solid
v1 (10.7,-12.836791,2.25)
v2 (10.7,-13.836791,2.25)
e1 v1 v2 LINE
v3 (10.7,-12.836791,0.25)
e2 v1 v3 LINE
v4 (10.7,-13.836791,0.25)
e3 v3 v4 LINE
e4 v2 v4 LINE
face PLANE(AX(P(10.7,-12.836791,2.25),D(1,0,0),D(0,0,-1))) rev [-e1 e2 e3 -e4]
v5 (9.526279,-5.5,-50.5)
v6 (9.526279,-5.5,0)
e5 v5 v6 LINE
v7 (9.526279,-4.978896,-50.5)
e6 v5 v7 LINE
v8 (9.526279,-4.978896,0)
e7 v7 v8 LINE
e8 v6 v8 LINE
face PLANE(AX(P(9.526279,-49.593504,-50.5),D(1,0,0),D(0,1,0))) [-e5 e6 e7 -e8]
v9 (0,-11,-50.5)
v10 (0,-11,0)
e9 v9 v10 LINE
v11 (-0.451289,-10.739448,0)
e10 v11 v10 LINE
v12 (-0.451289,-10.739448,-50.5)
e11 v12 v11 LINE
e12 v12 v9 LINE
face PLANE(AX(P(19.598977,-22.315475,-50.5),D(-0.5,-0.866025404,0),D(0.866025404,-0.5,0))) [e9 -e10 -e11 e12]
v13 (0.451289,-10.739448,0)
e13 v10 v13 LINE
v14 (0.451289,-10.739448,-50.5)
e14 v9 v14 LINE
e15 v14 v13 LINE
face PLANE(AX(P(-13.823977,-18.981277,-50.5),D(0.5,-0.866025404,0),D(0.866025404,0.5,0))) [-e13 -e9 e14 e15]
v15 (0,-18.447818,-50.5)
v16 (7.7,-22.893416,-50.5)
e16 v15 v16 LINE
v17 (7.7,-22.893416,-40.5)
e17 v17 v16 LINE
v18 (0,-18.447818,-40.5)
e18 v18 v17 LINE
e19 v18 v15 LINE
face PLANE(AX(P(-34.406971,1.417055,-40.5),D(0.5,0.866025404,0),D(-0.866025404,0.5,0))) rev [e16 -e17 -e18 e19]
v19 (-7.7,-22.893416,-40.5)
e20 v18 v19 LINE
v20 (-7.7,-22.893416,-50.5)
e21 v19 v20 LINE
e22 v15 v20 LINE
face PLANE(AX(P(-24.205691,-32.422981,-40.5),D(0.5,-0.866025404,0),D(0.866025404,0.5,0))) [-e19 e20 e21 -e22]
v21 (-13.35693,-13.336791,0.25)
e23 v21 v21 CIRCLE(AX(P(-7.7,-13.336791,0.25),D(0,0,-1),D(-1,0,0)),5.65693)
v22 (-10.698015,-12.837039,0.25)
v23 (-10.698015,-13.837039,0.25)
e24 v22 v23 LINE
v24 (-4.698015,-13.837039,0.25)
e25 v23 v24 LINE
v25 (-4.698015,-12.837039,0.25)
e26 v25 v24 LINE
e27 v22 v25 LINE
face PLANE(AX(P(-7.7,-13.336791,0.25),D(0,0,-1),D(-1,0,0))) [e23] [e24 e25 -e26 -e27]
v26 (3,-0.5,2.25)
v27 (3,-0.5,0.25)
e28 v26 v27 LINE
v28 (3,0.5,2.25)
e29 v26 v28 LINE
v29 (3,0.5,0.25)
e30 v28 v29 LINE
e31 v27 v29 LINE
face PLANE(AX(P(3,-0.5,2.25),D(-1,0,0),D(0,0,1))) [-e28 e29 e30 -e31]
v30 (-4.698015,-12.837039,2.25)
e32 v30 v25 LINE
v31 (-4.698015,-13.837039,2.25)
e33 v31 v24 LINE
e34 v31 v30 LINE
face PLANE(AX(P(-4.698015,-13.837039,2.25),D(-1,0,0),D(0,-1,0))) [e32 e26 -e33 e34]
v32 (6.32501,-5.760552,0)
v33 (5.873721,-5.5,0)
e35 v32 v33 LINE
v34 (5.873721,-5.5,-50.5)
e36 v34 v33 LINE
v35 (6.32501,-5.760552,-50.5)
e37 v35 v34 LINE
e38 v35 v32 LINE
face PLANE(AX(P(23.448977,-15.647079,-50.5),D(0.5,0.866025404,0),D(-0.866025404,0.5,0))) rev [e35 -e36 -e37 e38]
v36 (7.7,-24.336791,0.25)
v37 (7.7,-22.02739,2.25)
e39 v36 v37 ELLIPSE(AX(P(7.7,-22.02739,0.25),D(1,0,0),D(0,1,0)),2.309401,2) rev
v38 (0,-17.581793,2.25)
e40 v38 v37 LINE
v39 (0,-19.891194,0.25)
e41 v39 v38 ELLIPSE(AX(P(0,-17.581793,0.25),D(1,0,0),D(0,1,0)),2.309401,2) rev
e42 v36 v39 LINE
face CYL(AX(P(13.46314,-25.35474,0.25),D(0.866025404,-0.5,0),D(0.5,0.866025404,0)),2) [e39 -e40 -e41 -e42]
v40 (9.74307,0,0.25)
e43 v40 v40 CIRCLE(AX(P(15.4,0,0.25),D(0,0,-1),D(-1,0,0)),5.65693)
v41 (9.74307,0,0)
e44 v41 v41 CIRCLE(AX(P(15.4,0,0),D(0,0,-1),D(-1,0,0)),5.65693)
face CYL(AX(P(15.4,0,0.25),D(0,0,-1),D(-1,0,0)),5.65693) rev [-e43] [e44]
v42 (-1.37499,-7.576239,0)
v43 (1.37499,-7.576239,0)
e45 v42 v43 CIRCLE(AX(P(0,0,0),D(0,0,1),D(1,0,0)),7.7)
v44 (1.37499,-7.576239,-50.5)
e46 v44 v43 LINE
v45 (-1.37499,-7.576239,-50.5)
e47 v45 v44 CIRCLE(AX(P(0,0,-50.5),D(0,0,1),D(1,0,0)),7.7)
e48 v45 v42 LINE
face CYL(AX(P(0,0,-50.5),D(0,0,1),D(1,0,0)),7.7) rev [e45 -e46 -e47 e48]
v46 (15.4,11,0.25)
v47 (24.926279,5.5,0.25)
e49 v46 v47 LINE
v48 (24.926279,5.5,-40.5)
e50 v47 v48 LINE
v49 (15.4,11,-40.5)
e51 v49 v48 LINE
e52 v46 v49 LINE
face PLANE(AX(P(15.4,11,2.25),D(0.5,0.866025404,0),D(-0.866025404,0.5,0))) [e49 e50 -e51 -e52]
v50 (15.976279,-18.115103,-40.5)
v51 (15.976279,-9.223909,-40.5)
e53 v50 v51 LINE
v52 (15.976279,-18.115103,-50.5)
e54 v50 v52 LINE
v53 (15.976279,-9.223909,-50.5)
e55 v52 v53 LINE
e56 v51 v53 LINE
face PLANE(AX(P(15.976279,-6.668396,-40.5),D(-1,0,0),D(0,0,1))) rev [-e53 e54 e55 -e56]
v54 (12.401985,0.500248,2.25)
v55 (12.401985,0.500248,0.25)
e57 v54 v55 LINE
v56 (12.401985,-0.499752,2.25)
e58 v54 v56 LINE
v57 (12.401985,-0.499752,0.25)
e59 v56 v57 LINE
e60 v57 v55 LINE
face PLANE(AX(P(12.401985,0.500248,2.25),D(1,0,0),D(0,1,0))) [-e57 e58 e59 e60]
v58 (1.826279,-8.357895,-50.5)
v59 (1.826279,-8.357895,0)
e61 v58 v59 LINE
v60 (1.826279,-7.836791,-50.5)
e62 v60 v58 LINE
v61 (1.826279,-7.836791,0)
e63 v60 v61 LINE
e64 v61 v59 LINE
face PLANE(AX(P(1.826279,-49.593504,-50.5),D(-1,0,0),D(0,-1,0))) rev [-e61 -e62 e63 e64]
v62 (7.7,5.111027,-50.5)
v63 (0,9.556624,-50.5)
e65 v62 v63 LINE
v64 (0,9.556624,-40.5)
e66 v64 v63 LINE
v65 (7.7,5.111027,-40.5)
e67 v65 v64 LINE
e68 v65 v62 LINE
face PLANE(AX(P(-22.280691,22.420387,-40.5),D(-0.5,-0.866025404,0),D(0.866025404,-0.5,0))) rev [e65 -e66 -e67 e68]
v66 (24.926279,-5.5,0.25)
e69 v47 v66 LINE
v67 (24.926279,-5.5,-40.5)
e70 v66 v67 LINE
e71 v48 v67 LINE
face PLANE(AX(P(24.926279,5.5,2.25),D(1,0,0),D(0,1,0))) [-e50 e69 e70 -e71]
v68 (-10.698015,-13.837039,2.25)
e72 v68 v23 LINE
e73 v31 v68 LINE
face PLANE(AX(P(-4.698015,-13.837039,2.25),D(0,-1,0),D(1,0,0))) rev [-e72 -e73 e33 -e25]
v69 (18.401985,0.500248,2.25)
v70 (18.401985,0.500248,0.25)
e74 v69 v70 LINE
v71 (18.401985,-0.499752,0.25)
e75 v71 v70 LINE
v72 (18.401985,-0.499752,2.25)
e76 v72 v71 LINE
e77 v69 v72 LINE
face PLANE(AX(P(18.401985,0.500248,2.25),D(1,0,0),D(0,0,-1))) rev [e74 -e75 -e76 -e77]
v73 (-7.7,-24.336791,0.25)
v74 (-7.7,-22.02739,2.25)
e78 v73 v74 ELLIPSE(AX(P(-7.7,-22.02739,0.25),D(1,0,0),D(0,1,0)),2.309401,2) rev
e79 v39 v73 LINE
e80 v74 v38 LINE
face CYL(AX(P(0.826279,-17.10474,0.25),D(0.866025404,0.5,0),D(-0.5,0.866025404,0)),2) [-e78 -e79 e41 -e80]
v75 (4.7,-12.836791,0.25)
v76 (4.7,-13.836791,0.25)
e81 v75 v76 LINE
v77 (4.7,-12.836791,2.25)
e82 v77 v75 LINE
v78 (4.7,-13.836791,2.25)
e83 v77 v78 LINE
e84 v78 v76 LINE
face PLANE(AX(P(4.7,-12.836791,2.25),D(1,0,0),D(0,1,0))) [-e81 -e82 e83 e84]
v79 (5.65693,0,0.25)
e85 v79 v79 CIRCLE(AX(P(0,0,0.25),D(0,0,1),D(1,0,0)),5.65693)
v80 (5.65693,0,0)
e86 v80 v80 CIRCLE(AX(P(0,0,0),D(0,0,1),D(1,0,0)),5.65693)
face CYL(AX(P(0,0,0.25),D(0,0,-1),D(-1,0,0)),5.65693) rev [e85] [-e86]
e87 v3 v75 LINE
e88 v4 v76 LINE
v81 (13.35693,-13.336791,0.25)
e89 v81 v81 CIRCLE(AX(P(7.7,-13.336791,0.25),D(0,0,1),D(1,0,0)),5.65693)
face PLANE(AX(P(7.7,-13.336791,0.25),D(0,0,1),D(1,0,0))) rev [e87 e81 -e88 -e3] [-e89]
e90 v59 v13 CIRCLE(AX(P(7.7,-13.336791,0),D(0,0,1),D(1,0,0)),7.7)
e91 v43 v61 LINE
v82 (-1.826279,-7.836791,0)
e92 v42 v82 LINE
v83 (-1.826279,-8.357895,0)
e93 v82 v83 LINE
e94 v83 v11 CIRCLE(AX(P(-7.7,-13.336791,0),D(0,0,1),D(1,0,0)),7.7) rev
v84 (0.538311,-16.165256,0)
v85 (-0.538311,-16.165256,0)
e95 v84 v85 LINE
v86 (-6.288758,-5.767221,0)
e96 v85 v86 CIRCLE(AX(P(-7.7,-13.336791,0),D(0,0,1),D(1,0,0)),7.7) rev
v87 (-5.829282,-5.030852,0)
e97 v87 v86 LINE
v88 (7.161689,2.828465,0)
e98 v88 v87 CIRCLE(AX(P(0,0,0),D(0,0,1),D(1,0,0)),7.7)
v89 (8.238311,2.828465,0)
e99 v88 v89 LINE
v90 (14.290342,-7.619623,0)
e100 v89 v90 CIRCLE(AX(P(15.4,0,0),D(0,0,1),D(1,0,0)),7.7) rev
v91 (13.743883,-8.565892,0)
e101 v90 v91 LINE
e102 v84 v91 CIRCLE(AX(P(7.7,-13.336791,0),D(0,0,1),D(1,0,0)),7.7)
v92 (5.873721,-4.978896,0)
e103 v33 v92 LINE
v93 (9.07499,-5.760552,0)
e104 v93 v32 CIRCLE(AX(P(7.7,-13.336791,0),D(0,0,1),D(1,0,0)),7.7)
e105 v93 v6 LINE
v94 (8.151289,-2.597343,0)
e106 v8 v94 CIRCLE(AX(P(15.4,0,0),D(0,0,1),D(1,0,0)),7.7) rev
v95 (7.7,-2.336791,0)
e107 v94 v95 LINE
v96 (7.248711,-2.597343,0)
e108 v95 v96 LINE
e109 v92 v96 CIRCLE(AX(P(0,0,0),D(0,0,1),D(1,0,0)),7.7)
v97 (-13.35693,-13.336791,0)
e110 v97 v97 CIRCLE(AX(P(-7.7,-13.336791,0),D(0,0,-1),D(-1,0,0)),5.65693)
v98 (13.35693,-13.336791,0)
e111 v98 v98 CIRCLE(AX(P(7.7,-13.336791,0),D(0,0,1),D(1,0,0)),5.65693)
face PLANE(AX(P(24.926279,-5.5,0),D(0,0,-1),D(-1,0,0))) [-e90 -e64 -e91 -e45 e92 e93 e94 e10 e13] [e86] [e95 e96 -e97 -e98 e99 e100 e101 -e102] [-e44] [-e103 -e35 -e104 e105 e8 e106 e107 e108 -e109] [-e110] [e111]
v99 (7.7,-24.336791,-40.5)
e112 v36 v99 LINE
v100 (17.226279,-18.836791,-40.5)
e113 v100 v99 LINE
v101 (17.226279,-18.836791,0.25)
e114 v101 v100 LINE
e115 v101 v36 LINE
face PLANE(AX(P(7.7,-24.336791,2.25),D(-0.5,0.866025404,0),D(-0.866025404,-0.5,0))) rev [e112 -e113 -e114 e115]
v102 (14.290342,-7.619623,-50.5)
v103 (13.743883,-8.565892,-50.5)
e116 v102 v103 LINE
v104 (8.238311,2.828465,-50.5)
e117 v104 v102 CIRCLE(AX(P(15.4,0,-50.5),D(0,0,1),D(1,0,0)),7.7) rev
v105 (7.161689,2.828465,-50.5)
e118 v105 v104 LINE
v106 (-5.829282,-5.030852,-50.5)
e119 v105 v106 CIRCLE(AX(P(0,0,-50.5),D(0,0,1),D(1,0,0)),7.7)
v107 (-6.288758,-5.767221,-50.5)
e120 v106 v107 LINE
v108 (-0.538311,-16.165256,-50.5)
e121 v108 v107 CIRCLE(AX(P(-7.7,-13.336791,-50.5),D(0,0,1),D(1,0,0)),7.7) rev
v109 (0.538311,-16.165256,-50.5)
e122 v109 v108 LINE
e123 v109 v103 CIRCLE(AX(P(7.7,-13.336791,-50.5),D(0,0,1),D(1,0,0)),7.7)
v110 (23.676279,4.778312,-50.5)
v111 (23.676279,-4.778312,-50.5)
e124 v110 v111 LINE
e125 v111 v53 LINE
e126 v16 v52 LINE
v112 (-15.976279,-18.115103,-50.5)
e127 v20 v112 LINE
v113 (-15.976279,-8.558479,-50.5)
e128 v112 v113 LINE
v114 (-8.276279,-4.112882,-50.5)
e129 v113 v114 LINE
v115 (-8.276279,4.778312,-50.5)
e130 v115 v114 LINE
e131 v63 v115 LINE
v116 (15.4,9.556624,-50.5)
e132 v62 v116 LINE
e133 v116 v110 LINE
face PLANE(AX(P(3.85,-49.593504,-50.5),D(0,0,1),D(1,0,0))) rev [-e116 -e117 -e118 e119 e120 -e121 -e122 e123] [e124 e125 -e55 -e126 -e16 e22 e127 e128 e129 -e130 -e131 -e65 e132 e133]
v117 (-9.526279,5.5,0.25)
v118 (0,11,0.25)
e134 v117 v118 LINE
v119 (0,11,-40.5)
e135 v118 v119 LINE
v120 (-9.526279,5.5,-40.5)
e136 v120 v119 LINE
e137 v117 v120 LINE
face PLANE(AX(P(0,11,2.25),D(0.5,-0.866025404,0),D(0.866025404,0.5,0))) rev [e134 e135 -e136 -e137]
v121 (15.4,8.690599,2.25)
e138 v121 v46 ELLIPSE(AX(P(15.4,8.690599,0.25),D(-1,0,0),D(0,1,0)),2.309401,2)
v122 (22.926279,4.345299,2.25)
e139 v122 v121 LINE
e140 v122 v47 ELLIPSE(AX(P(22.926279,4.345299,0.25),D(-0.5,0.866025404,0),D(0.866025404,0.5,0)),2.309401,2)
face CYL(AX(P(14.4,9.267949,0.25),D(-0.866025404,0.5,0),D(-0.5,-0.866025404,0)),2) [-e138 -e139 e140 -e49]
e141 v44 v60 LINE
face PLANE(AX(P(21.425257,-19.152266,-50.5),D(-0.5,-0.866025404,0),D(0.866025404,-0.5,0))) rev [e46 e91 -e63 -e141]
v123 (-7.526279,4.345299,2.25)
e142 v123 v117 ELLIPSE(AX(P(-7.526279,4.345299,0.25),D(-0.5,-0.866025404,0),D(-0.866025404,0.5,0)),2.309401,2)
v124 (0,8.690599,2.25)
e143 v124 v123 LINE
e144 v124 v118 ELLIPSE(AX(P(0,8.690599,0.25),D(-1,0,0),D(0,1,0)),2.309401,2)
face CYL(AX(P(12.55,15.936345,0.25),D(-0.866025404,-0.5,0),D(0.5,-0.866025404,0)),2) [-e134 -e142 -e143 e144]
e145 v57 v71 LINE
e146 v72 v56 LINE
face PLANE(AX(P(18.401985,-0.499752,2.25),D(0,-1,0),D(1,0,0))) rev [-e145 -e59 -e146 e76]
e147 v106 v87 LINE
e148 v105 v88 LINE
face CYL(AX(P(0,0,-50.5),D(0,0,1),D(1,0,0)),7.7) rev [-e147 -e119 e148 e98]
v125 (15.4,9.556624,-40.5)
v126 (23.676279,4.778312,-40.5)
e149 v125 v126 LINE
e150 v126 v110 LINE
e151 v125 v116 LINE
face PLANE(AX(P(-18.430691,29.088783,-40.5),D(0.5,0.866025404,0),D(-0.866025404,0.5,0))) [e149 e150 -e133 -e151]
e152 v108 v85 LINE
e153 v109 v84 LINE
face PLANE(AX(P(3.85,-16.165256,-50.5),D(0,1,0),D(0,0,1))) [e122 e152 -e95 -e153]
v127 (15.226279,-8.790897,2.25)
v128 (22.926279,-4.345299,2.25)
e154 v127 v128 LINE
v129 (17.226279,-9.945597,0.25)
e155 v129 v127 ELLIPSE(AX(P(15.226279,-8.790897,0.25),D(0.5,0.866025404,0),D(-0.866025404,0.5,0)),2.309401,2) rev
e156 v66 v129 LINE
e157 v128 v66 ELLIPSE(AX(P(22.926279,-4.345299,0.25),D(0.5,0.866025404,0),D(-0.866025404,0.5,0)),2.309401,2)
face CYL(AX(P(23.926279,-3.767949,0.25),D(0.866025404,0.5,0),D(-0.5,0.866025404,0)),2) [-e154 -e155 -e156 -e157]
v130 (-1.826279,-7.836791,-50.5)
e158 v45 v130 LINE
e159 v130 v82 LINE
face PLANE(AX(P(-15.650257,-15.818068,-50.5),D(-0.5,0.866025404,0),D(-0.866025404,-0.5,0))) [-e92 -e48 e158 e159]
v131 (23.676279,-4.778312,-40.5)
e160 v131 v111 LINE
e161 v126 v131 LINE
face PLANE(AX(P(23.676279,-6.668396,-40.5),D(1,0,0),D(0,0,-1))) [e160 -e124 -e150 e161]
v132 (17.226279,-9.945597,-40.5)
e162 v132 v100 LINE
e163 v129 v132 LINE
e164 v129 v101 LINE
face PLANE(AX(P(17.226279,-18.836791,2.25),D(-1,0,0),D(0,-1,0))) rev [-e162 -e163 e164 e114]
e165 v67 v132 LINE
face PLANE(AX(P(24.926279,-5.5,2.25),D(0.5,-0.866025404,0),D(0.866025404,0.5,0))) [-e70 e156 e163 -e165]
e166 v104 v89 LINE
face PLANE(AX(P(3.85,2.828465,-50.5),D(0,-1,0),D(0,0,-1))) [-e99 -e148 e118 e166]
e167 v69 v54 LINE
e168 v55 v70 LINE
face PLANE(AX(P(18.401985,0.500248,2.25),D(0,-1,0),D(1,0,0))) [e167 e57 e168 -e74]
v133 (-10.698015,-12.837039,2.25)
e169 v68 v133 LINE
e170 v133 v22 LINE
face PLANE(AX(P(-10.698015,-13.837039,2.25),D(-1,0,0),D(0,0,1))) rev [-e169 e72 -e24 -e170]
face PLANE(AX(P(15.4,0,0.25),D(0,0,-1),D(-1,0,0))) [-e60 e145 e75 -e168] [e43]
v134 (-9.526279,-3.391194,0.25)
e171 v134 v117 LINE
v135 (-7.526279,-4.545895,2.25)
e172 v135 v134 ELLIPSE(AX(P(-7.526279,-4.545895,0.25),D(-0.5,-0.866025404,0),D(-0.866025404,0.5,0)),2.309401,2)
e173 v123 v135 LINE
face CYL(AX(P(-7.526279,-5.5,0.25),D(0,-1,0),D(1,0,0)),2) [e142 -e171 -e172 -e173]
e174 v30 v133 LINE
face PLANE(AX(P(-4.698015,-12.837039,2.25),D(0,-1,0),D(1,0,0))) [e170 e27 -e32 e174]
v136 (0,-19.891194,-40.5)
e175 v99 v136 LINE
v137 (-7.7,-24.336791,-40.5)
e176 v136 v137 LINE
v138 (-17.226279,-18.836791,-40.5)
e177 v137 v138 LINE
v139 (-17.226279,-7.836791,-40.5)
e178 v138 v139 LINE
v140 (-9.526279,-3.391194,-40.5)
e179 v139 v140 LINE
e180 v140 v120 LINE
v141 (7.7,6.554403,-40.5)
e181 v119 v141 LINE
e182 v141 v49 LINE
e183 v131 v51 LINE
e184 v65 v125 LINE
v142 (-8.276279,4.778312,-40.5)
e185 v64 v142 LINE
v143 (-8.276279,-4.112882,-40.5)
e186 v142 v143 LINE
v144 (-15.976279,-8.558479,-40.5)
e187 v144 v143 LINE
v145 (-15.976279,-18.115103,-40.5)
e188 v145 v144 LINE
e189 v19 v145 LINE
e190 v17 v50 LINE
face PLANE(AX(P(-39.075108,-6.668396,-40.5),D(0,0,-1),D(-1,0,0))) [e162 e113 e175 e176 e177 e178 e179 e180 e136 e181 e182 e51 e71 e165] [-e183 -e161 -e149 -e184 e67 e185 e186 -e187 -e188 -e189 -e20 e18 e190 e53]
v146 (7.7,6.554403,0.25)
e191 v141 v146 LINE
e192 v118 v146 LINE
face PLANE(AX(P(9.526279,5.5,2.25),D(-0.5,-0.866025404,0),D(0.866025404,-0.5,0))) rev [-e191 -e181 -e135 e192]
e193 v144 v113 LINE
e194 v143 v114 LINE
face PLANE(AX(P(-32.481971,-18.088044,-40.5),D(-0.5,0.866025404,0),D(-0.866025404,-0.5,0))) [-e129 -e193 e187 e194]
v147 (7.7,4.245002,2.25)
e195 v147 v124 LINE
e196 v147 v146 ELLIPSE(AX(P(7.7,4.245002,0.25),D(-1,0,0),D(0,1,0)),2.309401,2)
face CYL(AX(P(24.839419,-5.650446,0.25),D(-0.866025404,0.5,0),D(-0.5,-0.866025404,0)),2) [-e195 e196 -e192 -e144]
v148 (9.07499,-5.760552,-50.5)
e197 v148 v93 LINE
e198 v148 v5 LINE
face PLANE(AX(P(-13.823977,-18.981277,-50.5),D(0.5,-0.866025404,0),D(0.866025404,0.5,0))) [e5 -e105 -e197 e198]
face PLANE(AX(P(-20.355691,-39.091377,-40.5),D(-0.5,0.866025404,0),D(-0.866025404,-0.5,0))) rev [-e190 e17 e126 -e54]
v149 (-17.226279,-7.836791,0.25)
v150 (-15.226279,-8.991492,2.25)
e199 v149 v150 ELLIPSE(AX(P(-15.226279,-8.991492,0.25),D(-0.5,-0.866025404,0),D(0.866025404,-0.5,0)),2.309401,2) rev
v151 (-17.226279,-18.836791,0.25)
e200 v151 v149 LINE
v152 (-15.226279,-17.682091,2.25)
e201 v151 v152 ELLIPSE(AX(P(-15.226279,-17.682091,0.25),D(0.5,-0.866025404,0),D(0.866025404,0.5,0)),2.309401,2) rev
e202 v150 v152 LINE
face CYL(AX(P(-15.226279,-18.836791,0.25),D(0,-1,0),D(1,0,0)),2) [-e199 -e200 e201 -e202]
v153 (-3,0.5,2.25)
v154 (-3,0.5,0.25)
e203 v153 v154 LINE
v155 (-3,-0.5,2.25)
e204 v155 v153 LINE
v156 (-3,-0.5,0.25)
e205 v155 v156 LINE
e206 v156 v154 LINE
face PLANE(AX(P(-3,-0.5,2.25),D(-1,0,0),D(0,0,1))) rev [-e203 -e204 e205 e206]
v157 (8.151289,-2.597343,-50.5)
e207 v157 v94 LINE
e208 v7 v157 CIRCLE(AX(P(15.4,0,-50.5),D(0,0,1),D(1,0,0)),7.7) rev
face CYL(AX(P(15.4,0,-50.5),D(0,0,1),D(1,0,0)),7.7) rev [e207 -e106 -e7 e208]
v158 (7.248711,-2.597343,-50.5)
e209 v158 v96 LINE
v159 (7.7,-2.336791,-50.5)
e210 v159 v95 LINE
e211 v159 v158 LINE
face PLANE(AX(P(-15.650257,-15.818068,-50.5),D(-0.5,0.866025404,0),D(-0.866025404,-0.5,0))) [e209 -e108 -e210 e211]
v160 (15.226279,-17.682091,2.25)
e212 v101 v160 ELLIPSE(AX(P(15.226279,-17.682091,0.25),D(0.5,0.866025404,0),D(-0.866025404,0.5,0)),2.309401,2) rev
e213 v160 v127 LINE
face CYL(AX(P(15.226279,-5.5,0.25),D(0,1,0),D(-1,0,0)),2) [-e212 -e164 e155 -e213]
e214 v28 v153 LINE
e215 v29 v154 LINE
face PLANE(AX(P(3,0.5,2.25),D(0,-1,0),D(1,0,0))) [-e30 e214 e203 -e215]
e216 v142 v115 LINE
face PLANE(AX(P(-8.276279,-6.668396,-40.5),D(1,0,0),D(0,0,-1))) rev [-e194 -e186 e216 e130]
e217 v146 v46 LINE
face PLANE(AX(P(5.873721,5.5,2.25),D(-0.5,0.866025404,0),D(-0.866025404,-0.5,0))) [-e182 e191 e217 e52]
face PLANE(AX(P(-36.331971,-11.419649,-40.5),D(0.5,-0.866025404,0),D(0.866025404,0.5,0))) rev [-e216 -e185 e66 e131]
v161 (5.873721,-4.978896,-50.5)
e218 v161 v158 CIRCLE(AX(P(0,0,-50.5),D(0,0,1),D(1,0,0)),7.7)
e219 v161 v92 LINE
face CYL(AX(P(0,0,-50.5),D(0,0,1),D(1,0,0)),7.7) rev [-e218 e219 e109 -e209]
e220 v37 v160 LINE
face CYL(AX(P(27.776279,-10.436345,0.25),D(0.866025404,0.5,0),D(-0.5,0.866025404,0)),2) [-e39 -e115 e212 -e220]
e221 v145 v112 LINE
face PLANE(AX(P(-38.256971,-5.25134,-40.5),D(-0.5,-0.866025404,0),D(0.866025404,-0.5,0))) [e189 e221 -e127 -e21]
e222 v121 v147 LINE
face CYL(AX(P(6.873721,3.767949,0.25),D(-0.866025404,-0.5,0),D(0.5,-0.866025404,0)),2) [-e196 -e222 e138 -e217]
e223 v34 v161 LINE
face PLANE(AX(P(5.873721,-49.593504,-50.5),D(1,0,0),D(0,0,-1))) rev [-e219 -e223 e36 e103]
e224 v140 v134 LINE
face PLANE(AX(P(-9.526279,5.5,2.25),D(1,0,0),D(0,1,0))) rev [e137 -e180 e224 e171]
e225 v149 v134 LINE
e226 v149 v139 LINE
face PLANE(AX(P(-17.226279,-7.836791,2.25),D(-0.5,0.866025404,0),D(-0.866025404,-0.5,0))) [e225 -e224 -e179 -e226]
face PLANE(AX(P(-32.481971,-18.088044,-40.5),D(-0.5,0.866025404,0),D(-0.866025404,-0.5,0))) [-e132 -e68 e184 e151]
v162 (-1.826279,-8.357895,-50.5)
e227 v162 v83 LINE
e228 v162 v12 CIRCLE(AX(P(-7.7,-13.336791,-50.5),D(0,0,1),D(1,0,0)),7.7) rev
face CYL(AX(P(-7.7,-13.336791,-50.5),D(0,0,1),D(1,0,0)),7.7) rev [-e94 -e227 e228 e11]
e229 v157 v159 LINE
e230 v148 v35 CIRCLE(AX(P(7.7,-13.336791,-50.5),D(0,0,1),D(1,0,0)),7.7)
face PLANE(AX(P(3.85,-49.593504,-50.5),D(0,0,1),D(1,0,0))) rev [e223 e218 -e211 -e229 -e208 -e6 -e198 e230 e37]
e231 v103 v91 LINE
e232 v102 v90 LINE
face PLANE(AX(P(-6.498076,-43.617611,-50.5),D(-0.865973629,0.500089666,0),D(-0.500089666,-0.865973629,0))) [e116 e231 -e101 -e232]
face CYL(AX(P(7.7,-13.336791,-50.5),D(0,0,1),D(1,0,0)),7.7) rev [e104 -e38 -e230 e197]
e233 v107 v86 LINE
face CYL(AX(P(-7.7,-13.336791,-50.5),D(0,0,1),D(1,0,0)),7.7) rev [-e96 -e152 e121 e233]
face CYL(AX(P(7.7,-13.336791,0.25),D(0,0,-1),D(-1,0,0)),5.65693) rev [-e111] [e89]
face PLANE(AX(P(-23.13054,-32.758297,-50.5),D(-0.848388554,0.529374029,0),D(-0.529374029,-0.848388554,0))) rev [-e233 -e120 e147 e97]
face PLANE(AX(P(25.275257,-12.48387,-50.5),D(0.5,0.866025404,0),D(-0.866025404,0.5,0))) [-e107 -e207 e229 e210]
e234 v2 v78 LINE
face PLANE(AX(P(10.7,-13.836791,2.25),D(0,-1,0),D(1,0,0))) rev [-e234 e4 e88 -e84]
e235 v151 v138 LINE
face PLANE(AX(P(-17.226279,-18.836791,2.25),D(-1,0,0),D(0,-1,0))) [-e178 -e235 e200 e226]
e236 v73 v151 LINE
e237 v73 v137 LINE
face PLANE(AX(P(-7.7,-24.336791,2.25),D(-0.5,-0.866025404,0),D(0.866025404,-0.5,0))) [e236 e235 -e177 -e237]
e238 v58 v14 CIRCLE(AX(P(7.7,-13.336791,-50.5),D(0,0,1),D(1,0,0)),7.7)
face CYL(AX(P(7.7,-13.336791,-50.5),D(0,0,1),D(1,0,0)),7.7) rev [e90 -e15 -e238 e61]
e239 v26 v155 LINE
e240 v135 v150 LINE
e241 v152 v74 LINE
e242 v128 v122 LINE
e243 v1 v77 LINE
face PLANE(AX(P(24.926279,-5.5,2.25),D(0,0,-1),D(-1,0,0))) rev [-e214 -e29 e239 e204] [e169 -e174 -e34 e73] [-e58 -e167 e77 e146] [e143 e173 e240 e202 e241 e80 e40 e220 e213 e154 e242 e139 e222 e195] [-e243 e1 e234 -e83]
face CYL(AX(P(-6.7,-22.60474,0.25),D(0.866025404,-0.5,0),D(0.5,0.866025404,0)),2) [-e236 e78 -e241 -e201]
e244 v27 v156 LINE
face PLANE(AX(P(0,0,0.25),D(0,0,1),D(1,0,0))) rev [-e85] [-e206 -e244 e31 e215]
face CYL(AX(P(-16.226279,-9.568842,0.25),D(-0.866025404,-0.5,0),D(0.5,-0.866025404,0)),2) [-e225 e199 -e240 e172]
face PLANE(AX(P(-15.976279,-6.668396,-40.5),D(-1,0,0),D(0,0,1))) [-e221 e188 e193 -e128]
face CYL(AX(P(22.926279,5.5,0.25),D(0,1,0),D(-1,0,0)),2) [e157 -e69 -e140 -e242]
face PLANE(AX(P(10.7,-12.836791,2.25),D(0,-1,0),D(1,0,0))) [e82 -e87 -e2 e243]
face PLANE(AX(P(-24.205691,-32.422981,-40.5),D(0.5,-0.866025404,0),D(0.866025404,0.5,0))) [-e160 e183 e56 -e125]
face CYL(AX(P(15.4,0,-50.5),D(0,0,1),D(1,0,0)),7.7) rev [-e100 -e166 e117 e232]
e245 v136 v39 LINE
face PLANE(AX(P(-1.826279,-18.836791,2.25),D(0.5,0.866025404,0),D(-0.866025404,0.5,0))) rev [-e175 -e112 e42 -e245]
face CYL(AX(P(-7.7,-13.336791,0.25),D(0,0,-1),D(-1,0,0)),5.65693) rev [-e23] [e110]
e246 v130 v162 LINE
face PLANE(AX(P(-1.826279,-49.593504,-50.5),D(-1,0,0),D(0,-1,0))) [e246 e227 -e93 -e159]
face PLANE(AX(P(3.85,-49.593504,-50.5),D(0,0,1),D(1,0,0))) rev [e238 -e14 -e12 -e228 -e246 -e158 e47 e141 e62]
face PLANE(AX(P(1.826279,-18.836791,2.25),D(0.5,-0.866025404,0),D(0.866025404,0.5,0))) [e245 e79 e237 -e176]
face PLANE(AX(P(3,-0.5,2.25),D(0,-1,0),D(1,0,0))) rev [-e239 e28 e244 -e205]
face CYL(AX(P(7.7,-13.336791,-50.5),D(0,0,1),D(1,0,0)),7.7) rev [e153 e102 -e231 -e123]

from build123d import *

# Parameters (mm, degrees)
SKETCH2_W           = 6
SKETCH2_H           = 1
BOSS_EXTRUDE1_DEPTH = 2.25
BOSS_EXTRUDE2_DEPTH = 50.5
SKETCH2_5_R         = 5.656929669
CUT_EXTRUDE1_DEPTH  = 0.25
FILLET1_R           = 2
CUT_EXTRUDE3_DEPTH  = 10


with BuildPart() as part:
    # Sketch2 → Boss-Extrude1 (new body)
    with BuildSketch(Plane.XY):
        Polygon((7.7, 6.554402927), (0, 11), (-9.526279442, 5.5), (-9.526279442, -3.391194146), (-17.226279442, -7.836791218), (-17.226279442, -18.836791218), (-7.7, -24.336791218), (0, -19.891194146), (7.7, -24.336791218), (17.226279442, -18.836791218), (17.226279442, -9.945597073), (24.926279442, -5.5), (24.926279442, 5.5), (15.4, 11), align=None)
        Rectangle(SKETCH2_W, SKETCH2_H, mode=Mode.SUBTRACT)
        with Locations((15.401984556, 0.000248069)):
            Rectangle(SKETCH2_W, SKETCH2_H, mode=Mode.SUBTRACT)
        with Locations((-7.698015444, -13.337039288)):
            Rectangle(SKETCH2_W, SKETCH2_H, mode=Mode.SUBTRACT)
        with Locations((7.7, -13.336791218)):
            Rectangle(SKETCH2_W, SKETCH2_H, mode=Mode.SUBTRACT)
    extrude(amount=BOSS_EXTRUDE1_DEPTH)

    # Sketch2<4> → Boss-Extrude2 (add)
    # profile 1 of 3: a face of its own
    with BuildSketch(Plane.XY):
        Polygon((7.7, 6.554402927), (0, 11), (-9.526279442, 5.5), (-9.526279442, -3.391194146), (-17.226279442, -7.836791218), (-17.226279442, -18.836791218), (-7.7, -24.336791218), (0, -19.891194146), (7.7, -24.336791218), (17.226279442, -18.836791218), (17.226279442, -9.945597073), (24.926279442, -5.5), (24.926279442, 5.5), (15.4, 11), align=None)
        with BuildLine():
            Line((7.161688815, 2.828464835), (8.238311185, 2.828464835))
            ThreePointArc((8.238311185, 2.828464835), (22.062914613, 3.859477797), (14.290341933, -7.619623283))
            Line((14.290341933, -7.619623283), (13.743882842, -8.565891912))
            ThreePointArc((13.743882842, -8.565891912), (11.540567196, -20.010623971), (0.538311185, -16.165256053))
            Line((0.538311185, -16.165256053), (-0.538311185, -16.165256053))
            ThreePointArc((-0.538311185, -16.165256053), (-14.438217046, -17.063241411), (-6.288758272, -5.767220769))
            Line((-6.288758272, -5.767220769), (-5.82928192, -5.030852045))
            ThreePointArc((-5.82928192, -5.030852045), (-3.985729856, 6.588167994), (7.161688815, 2.828464835))
        make_face(mode=Mode.SUBTRACT)
    # profile 2 of 3: a face of its own
    with BuildSketch(Plane.XY):
        with BuildLine():
            Line((7.7, -2.336791218), (7.248710822, -2.597343147))
            ThreePointArc((7.248710822, -2.597343147), (6.668395609, -3.85), (5.873720558, -4.978896143))
            Line((5.873720558, -4.978896143), (5.873720558, -5.5))
            Line((5.873720558, -5.5), (6.325009737, -5.760551929))
            ThreePointArc((6.325009737, -5.760551929), (7.7, -5.636791218), (9.074990263, -5.760551929))
            Line((9.074990263, -5.760551929), (9.526279442, -5.5))
            Line((9.526279442, -5.5), (9.526279442, -4.978896143))
            ThreePointArc((9.526279442, -4.978896143), (8.731604391, -3.85), (8.151289178, -2.597343147))
            Line((8.151289178, -2.597343147), (7.7, -2.336791218))
        make_face()
    # profile 3 of 3: a face of its own
    with BuildSketch(Plane.XY):
        with BuildLine():
            ThreePointArc((1.374990263, -7.57623929), (0, -7.7), (-1.374990263, -7.57623929))
            Line((-1.374990263, -7.57623929), (-1.826279442, -7.836791218))
            Line((-1.826279442, -7.836791218), (-1.826279442, -8.357895075))
            ThreePointArc((-1.826279442, -8.357895075), (-1.031604391, -9.486791218), (-0.451289178, -10.739448071))
            Line((-0.451289178, -10.739448071), (0, -11))
            Line((0, -11), (0.451289178, -10.739448071))
            ThreePointArc((0.451289178, -10.739448071), (1.031604391, -9.486791218), (1.826279442, -8.357895075))
            Line((1.826279442, -8.357895075), (1.826279442, -7.836791218))
            Line((1.826279442, -7.836791218), (1.374990263, -7.57623929))
        make_face()
    extrude(amount=-BOSS_EXTRUDE2_DEPTH)

    # Sketch2<5> → Cut-Extrude1 (cut)
    with BuildSketch(Plane.XY):
        with Locations((15.4, 0)):
            Circle(SKETCH2_5_R)
        Circle(SKETCH2_5_R)
        with Locations((7.7, -13.336791218)):
            Circle(SKETCH2_5_R)
        with Locations((-7.7, -13.336791218)):
            Circle(SKETCH2_5_R)
    extrude(amount=CUT_EXTRUDE1_DEPTH, mode=Mode.SUBTRACT)

    # Fillet1
    fillet1_edges = [part.edges().sort_by_distance(p)[0] for p in [
        (3.85, 8.777201464, 2.25),
        (20.163139721, 8.25, 2.25),
        (11.55, 8.777201464, 2.25),
        (24.926279442, 0, 2.25),
        (21.076279442, -7.722798536, 2.25),
        (17.226279442, -14.391194146, 2.25),
        (12.463139721, -21.586791218, 2.25),
        (3.85, -22.113992682, 2.25),
        (-3.85, -22.113992682, 2.25),
        (-12.463139721, -21.586791218, 2.25),
        (-17.226279442, -13.336791218, 2.25),
        (-13.376279442, -5.613992682, 2.25),
        (-9.526279442, 1.054402927, 2.25),
        (-4.763139721, 8.25, 2.25),
    ]]
    fillet(fillet1_edges, radius=FILLET1_R)

    # Sketch7 → Cut-Extrude3 (cut)
    with BuildSketch(Plane(origin=(0, 0, -50.5), x_dir=(-1, 0, 0), z_dir=(0, 0, -1))):
        Polygon((-15.4, 11), (-24.926279442, 5.5), (-24.926279442, -5.5), (-17.226279442, -9.945597073), (-17.226279442, -18.836791218), (-7.7, -24.336791218), (0, -19.891194146), (7.7, -24.336791218), (17.226279442, -18.836791218), (17.226279442, -7.836791218), (9.526279442, -3.391194146), (9.526279442, 5.5), (0, 11), (-7.7, 6.554402927), align=None)
        Polygon((-15.4, 9.556624327), (-7.7, 5.111027254), (0, 9.556624327), (8.276279442, 4.778312164), (8.276279442, -4.112881982), (15.976279442, -8.558479055), (15.976279442, -18.115103382), (7.7, -22.893415545), (0, -18.447818473), (-7.7, -22.893415545), (-15.976279442, -18.115103382), (-15.976279442, -9.223909236), (-23.676279442, -4.778312164), (-23.676279442, 4.778312164), align=None, mode=Mode.SUBTRACT)
    extrude(amount=-CUT_EXTRUDE3_DEPTH, mode=Mode.SUBTRACT)


solid = part.part
